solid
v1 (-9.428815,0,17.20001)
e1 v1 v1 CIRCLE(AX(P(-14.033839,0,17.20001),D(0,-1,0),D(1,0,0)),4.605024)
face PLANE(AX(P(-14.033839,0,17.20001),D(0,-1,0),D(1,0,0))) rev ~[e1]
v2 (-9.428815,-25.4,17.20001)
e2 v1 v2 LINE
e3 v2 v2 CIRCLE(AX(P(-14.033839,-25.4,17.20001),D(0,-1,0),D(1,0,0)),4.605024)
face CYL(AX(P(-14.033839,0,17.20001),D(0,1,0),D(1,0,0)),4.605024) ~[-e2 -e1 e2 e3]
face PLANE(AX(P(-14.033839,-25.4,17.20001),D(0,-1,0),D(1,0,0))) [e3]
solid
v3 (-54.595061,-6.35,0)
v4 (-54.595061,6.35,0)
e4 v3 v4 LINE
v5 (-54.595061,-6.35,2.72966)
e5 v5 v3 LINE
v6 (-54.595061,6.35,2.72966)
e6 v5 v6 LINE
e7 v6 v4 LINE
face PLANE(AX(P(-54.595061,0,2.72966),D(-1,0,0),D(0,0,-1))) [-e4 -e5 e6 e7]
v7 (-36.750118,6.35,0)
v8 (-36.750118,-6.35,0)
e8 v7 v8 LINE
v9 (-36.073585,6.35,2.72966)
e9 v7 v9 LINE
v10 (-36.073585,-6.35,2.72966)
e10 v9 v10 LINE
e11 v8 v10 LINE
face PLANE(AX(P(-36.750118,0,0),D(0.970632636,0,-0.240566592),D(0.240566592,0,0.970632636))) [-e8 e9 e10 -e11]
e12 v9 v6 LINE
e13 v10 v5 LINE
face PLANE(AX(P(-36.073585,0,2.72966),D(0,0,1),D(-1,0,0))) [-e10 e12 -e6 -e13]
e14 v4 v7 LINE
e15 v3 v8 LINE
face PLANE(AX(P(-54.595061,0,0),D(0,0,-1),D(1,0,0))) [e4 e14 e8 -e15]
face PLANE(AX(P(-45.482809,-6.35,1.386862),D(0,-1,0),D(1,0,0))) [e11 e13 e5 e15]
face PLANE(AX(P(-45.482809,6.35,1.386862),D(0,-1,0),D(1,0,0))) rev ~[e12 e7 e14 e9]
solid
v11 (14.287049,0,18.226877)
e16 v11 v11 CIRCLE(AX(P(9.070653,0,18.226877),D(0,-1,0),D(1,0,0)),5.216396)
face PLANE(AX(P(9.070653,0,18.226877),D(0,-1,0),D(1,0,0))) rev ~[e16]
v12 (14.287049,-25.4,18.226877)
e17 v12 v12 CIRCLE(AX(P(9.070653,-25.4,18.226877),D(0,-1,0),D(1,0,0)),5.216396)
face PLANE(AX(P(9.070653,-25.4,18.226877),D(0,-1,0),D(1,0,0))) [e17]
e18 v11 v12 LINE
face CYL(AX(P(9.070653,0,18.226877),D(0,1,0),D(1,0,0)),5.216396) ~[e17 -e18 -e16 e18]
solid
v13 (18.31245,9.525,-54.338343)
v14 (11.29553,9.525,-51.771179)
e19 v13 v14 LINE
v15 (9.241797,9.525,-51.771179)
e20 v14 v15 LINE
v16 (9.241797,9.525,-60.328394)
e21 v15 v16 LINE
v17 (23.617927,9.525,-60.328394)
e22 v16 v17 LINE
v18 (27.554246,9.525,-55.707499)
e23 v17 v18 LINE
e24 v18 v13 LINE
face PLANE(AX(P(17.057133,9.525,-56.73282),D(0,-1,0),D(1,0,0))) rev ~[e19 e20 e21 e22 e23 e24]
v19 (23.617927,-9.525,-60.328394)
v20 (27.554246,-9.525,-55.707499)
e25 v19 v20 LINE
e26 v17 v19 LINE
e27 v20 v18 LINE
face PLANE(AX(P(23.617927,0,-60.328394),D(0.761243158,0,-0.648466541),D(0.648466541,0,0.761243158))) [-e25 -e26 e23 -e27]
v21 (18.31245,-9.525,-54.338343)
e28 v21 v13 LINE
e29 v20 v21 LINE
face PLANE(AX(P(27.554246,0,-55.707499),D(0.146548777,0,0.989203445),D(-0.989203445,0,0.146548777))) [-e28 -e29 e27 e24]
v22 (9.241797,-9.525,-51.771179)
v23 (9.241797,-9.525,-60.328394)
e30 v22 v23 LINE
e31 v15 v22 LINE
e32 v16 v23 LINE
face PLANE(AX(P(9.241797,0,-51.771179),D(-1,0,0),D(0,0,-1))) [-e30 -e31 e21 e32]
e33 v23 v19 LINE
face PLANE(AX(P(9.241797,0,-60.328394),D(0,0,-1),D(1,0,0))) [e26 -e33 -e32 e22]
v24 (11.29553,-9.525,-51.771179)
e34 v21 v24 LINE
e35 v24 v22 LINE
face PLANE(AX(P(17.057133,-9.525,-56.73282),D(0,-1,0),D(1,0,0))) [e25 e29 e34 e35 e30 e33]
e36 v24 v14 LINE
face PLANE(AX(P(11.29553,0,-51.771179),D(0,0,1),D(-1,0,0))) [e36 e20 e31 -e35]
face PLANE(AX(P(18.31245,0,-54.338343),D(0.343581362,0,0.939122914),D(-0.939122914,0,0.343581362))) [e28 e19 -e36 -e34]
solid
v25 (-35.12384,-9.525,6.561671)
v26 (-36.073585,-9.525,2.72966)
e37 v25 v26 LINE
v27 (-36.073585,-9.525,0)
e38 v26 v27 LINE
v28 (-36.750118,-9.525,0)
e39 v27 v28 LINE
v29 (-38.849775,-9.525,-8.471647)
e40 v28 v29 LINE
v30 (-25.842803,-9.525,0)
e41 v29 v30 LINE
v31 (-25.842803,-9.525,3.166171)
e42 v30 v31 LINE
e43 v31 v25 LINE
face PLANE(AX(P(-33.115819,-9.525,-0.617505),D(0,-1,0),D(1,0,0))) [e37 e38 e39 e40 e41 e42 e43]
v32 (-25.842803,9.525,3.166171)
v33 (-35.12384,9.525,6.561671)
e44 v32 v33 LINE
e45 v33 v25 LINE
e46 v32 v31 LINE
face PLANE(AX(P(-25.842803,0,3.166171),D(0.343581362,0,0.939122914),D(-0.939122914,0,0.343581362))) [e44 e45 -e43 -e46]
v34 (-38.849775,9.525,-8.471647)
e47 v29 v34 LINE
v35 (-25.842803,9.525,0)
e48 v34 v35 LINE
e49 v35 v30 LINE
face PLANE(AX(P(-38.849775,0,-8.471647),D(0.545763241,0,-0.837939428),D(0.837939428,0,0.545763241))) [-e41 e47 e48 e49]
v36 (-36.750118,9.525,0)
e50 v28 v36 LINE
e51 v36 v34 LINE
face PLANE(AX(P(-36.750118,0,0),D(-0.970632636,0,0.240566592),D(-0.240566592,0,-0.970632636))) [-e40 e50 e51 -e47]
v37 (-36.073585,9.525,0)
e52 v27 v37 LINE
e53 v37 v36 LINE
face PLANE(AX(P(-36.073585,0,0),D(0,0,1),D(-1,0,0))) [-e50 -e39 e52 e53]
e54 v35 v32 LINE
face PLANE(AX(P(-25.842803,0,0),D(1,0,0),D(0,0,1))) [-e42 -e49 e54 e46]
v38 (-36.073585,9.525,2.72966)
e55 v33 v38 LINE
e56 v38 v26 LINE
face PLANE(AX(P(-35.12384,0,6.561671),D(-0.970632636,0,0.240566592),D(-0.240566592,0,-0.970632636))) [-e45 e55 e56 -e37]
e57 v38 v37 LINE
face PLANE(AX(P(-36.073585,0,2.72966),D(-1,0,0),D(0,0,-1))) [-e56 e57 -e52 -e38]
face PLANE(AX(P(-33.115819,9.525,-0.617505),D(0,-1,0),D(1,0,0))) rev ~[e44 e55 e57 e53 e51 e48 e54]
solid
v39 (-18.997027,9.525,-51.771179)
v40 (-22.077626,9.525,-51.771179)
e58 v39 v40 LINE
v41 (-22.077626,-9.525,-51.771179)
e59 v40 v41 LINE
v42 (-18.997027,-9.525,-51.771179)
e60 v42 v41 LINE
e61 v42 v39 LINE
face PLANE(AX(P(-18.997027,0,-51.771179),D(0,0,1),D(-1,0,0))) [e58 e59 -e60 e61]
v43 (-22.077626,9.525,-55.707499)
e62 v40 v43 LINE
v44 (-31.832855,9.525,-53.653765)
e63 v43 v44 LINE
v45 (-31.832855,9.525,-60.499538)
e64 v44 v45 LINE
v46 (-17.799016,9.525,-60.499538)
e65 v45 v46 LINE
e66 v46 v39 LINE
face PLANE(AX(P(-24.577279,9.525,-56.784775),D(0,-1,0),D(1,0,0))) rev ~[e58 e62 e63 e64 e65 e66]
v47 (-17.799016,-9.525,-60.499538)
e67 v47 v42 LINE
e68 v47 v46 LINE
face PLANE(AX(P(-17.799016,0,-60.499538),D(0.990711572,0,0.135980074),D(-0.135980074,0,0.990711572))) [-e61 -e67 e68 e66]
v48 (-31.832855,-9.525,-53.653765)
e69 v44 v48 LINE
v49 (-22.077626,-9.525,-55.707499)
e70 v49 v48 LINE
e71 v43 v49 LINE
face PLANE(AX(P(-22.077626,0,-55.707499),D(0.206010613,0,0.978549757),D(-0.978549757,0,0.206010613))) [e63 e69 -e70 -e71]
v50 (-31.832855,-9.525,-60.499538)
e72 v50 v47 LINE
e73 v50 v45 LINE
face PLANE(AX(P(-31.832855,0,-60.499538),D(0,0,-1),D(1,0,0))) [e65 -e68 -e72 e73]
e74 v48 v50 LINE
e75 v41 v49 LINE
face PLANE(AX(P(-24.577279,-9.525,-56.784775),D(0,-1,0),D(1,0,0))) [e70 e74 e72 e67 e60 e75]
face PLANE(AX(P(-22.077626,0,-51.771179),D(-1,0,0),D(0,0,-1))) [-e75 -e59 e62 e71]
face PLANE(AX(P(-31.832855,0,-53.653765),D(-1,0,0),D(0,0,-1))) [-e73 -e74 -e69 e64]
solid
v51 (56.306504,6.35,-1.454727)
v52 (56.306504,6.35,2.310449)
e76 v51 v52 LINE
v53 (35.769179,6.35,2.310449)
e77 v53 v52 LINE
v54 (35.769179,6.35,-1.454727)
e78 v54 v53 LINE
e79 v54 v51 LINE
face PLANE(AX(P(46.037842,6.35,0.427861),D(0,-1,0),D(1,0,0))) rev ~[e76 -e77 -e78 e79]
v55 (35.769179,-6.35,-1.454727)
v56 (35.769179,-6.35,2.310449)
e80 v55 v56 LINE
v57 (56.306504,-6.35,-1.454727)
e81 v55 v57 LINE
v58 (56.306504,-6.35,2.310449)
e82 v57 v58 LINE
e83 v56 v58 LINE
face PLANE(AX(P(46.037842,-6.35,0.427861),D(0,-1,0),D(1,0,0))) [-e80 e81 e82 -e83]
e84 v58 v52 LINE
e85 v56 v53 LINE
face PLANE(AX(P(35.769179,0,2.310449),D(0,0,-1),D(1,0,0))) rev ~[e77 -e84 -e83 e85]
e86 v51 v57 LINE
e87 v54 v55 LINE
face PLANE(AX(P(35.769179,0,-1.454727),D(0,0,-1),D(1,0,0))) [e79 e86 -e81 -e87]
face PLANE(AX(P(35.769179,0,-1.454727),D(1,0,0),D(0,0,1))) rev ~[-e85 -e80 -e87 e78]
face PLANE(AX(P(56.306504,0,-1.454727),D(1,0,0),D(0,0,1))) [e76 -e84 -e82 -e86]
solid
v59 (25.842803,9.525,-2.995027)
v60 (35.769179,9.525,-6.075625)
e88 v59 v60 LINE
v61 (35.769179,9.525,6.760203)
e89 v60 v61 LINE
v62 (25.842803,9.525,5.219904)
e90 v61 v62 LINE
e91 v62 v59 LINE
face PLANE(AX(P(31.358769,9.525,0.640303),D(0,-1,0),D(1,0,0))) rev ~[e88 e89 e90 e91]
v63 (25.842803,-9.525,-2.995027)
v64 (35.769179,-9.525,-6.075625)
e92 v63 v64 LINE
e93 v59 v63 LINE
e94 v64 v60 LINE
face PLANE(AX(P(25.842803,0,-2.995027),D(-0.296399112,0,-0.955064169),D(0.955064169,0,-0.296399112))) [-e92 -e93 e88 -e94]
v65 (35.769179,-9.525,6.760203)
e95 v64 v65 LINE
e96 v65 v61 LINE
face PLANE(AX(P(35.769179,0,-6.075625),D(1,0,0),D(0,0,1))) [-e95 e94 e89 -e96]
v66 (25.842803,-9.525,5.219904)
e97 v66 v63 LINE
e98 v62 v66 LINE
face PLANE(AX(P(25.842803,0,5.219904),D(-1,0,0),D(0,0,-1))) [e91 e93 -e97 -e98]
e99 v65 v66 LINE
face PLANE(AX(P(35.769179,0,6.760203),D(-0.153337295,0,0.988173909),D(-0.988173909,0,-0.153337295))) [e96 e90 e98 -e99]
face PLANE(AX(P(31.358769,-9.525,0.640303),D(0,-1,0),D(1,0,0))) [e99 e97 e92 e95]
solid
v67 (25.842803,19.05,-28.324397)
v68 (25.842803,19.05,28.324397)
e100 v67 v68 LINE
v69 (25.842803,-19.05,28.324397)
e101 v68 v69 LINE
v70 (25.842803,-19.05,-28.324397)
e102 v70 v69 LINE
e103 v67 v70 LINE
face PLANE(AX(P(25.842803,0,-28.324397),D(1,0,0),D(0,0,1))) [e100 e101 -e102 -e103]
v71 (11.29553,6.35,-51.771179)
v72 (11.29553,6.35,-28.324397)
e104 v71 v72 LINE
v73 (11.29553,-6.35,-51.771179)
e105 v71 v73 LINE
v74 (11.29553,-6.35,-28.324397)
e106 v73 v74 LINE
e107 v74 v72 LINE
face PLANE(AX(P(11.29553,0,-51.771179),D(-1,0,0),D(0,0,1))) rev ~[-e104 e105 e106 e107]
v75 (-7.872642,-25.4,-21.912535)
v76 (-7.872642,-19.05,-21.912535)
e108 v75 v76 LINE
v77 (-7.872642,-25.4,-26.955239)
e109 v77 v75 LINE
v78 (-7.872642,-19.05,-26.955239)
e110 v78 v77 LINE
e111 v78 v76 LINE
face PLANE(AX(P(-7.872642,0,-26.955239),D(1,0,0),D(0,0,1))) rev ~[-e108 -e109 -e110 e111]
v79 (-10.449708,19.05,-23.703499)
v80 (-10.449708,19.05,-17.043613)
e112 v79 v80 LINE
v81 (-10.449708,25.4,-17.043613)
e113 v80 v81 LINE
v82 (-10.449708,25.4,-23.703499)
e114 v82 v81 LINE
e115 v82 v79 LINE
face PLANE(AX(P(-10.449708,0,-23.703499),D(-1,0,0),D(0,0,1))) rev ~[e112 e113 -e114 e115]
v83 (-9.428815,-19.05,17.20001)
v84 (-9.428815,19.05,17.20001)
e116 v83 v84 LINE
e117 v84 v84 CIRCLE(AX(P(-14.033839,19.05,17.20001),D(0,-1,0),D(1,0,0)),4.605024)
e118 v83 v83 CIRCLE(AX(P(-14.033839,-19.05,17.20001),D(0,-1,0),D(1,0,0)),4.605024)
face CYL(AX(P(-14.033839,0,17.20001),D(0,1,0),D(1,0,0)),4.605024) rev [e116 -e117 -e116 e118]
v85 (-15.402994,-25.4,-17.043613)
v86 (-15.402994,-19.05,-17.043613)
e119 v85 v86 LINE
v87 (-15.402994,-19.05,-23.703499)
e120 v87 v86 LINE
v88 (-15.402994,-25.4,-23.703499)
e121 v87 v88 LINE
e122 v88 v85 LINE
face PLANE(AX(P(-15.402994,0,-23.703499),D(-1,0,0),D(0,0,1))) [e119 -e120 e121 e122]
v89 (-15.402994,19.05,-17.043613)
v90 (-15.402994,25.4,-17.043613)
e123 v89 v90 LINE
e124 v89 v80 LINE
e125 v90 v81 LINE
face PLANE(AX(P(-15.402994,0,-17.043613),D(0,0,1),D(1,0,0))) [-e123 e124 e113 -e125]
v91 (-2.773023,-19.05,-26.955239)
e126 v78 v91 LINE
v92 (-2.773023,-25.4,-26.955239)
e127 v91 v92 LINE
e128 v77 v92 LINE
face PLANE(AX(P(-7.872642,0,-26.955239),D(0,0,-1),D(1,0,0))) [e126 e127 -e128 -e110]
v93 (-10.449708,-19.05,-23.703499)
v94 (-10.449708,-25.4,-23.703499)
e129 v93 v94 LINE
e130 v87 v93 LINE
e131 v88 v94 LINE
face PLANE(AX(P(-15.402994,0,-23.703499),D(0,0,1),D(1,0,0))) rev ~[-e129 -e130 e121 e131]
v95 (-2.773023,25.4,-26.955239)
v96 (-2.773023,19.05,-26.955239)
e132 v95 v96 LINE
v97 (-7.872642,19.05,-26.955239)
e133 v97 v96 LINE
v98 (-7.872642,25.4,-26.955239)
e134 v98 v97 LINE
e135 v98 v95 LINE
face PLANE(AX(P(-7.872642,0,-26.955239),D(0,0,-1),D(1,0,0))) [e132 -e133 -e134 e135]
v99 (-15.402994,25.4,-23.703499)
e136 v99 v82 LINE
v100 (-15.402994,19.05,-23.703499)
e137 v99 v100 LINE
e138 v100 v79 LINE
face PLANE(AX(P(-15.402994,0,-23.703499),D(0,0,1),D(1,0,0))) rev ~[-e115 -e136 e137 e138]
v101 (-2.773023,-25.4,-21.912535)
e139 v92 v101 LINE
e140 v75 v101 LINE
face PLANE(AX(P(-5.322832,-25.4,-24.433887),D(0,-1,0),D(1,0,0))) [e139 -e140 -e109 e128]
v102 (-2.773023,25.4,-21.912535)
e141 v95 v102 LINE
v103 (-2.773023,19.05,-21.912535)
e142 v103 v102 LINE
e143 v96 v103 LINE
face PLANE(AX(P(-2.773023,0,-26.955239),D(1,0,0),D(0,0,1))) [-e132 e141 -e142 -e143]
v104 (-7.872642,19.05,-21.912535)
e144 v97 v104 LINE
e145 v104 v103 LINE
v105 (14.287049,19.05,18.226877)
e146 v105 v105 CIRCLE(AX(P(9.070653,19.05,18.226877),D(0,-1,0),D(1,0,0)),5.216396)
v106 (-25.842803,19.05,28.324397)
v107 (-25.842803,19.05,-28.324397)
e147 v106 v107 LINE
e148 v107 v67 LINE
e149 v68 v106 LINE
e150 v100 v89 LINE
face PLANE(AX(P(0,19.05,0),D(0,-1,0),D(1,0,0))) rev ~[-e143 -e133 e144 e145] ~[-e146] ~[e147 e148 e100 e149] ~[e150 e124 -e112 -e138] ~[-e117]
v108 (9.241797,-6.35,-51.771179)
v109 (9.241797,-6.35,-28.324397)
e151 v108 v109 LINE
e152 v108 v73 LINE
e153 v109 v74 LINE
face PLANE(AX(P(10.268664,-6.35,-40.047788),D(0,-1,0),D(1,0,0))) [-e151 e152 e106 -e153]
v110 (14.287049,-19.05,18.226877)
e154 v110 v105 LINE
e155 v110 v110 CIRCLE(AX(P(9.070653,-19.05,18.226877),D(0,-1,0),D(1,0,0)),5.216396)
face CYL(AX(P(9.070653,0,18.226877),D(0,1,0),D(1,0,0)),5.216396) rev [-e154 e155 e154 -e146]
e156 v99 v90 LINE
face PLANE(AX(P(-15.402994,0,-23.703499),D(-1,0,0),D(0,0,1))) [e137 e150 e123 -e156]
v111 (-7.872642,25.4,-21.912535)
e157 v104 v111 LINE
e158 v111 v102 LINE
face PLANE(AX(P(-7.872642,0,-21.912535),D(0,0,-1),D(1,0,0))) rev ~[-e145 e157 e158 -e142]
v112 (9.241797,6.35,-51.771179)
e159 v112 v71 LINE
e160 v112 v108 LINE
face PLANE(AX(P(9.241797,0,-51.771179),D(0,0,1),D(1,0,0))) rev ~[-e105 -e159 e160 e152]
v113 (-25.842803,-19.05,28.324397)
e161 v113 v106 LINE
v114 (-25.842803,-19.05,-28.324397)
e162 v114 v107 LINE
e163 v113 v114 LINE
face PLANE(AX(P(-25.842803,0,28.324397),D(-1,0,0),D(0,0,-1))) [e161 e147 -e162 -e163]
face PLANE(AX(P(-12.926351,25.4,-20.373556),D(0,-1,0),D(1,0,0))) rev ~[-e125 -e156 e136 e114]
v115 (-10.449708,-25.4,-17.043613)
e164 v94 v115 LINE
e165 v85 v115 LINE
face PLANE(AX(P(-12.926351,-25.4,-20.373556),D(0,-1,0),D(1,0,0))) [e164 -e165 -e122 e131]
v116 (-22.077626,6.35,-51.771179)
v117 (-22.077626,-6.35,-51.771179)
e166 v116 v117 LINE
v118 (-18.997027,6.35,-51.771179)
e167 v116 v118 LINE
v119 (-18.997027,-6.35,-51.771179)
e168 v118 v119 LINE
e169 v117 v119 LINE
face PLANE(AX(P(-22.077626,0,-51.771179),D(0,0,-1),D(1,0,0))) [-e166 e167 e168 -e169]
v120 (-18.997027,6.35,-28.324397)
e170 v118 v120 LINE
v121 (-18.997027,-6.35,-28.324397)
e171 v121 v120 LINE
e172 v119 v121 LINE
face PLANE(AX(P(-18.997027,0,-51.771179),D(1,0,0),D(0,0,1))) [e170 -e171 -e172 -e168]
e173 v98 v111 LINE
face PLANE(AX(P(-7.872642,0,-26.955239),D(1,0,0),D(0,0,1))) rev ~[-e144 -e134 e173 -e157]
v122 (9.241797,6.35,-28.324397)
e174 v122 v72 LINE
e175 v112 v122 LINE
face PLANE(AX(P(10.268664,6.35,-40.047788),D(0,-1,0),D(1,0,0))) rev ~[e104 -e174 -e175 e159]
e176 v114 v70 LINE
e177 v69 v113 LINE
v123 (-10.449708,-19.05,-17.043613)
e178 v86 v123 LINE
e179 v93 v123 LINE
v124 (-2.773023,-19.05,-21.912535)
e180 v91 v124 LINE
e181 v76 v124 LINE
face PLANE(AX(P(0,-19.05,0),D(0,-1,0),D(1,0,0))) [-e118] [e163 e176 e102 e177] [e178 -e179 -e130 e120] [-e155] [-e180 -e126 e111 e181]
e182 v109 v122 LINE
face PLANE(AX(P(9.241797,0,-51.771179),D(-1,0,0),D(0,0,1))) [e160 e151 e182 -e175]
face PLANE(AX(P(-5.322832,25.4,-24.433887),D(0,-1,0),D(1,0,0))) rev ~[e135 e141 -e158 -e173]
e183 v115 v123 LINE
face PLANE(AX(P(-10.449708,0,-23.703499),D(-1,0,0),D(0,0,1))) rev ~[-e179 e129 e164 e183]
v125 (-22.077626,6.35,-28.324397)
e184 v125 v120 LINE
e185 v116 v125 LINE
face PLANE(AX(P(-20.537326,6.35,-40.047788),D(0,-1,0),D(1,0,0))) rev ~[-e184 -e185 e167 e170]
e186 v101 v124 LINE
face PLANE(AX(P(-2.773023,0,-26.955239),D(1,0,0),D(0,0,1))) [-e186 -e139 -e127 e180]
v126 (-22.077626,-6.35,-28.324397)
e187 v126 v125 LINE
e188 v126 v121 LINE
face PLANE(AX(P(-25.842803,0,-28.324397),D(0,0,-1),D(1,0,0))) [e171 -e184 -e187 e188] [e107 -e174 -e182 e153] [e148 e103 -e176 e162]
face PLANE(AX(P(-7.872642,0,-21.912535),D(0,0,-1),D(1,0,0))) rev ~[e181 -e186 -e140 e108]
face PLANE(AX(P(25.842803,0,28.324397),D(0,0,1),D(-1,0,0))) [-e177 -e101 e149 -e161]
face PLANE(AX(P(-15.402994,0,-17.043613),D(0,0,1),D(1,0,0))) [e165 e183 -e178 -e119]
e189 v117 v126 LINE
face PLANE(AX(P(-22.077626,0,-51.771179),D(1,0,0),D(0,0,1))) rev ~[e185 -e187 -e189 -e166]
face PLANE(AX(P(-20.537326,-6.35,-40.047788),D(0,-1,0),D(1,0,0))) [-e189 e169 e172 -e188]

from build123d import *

# Parameters (mm, degrees)
F0_R     = 4.6050240083
F1_DEPTH = 25.4
F0_R_2   = 5.2163960765
F0_W     = 5.0996192879
F0_H     = 5.0427047919
F0_W_2   = 4.9532863107
F0_H_2   = 6.6598858346
F2_DEPTH = 19.05
F0_W_3   = 20.5373242497
F0_H_3   = 3.765176516
F3_DEPTH = 6.35
F0_W_4   = 2.0537329838
F0_H_4   = 23.4467815608
F0_W_5   = 3.08059901
F4_DEPTH = 9.525
F6_DEPTH = 25.4


# Not quite as in the source:
# - the program builds the solid bodies; features that only make, move or delete a surface that nothing else refers to are left out


with BuildPart() as f1:
    # F0 (on Front) → F1 (new body)
    with BuildSketch(Plane.XZ):
        with Locations((-14.0338391066, 17.2000098974)):
            Circle(F0_R)
    extrude(amount=F1_DEPTH)


with BuildPart() as f1b:
    # F0 (on Front) → F1, piece 2 (new body)
    with BuildSketch(Plane.XZ):
        with Locations((9.070652537, 18.2268768549)):
            Circle(F0_R_2)
    extrude(amount=F1_DEPTH)


with BuildPart() as f2:
    # F0 (on Front) → F2 (new body, symmetric)
    with BuildSketch(Plane.XZ):
        Polygon((-25.8428025991, 0), (-25.8428025991, -28.3243972808), (-22.0776256174, -28.3243972808), (-18.9970266074, -28.3243972808), (9.24179703, -28.3243972808), (11.2955300137, -28.3243972808), (25.8428025991, -28.3243972808), (25.8428025991, -2.9950267635), (25.8428025991, 5.2199037746), (25.8428025991, 28.3243972808), (-25.8428025991, 28.3243972808), (-25.8428025991, 3.1661712565), align=None)
        with Locations((-5.3228323739, -24.4338870788)):
            Rectangle(F0_W, F0_H, mode=Mode.SUBTRACT)
        with Locations((-12.9263509633, -20.3735558485)):
            Rectangle(F0_W_2, F0_H_2, mode=Mode.SUBTRACT)
        with Locations((-14.0338391066, 17.2000098974)):
            Circle(F0_R, mode=Mode.SUBTRACT)
        with Locations((9.070652537, 18.2268768549)):
            Circle(F0_R_2, mode=Mode.SUBTRACT)
    extrude(amount=F2_DEPTH, both=True)

    # F0 (on Front) → F3, piece 2 (join, symmetric)
    with BuildSketch(Plane.XZ):
        with Locations((10.2686635219, -40.0477880612)):
            Rectangle(F0_W_4, F0_H_4)
        with Locations((-20.5373261124, -40.0477880612)):
            Rectangle(F0_W_5, F0_H_4)
    extrude(amount=F3_DEPTH, both=True)

    # F0 (on Front) → F6 (join, symmetric)
    with BuildSketch(Plane.XZ):
        with Locations((-12.9263509633, -20.3735558485)):
            Rectangle(F0_W_2, F0_H_2)
        with Locations((-5.3228323739, -24.4338870788)):
            Rectangle(F0_W, F0_H)
    extrude(amount=F6_DEPTH, both=True)


with BuildPart() as f3:
    # F0 (on Front) → F3 (new body, symmetric)
    with BuildSketch(Plane.XZ):
        with Locations((46.0378415883, 0.4278609995)):
            Rectangle(F0_W_3, F0_H_3)
    extrude(amount=F3_DEPTH, both=True)


with BuildPart() as f3b:
    # F0 (on Front) → F3, piece 3 (new body, symmetric)
    with BuildSketch(Plane.XZ):
        Polygon((-54.5950606465, 0), (-36.7501180492, 0), (-36.0735851604, 2.7296595719), (-54.5950606465, 2.7296595719), align=None)
    extrude(amount=F3_DEPTH, both=True)


with BuildPart() as f4:
    # F0 (on Front) → F4 (new body, symmetric)
    with BuildSketch(Plane.XZ):
        Polygon((35.7691794634, 6.7602032796), (25.8428025991, 5.2199037746), (25.8428025991, -2.9950267635), (35.7691794634, -6.0756253079), (35.7691794634, -1.4547272585), (35.7691794634, 2.3104492575), align=None)
    extrude(amount=F4_DEPTH, both=True)


with BuildPart() as f4b:
    # F0 (on Front) → F4, piece 2 (new body, symmetric)
    with BuildSketch(Plane.XZ):
        Polygon((11.2955300137, -51.7711788416), (9.24179703, -51.7711788416), (9.24179703, -60.3283941746), (23.617926985, -60.3283941746), (27.5542456657, -55.7074993849), (18.3124504983, -54.3383434415), align=None)
    extrude(amount=F4_DEPTH, both=True)


with BuildPart() as f4c:
    # F0 (on Front) → F4, piece 3 (new body, symmetric)
    with BuildSketch(Plane.XZ):
        Polygon((-18.9970266074, -51.7711788416), (-22.0776256174, -51.7711788416), (-22.0776256174, -55.7074993849), (-31.8328551948, -53.6537654698), (-31.8328551948, -60.4995377362), (-17.7990160882, -60.4995377362), align=None)
    extrude(amount=F4_DEPTH, both=True)


with BuildPart() as f4d:
    # F0 (on Front) → F4, piece 4 (new body, symmetric)
    with BuildSketch(Plane.XZ):
        Polygon((-38.8497747481, -8.4716472775), (-25.8428025991, 0), (-25.8428025991, 3.1661712565), (-35.1238397671, 6.5616707666), (-36.0735851604, 2.7296595719), (-36.0735851604, 0), (-36.7501180492, 0), align=None)
    extrude(amount=F4_DEPTH, both=True)


solid = Compound([f1.part, f1b.part, f2.part, f3.part, f3b.part, f4.part, f4b.part, f4c.part, f4d.part])
